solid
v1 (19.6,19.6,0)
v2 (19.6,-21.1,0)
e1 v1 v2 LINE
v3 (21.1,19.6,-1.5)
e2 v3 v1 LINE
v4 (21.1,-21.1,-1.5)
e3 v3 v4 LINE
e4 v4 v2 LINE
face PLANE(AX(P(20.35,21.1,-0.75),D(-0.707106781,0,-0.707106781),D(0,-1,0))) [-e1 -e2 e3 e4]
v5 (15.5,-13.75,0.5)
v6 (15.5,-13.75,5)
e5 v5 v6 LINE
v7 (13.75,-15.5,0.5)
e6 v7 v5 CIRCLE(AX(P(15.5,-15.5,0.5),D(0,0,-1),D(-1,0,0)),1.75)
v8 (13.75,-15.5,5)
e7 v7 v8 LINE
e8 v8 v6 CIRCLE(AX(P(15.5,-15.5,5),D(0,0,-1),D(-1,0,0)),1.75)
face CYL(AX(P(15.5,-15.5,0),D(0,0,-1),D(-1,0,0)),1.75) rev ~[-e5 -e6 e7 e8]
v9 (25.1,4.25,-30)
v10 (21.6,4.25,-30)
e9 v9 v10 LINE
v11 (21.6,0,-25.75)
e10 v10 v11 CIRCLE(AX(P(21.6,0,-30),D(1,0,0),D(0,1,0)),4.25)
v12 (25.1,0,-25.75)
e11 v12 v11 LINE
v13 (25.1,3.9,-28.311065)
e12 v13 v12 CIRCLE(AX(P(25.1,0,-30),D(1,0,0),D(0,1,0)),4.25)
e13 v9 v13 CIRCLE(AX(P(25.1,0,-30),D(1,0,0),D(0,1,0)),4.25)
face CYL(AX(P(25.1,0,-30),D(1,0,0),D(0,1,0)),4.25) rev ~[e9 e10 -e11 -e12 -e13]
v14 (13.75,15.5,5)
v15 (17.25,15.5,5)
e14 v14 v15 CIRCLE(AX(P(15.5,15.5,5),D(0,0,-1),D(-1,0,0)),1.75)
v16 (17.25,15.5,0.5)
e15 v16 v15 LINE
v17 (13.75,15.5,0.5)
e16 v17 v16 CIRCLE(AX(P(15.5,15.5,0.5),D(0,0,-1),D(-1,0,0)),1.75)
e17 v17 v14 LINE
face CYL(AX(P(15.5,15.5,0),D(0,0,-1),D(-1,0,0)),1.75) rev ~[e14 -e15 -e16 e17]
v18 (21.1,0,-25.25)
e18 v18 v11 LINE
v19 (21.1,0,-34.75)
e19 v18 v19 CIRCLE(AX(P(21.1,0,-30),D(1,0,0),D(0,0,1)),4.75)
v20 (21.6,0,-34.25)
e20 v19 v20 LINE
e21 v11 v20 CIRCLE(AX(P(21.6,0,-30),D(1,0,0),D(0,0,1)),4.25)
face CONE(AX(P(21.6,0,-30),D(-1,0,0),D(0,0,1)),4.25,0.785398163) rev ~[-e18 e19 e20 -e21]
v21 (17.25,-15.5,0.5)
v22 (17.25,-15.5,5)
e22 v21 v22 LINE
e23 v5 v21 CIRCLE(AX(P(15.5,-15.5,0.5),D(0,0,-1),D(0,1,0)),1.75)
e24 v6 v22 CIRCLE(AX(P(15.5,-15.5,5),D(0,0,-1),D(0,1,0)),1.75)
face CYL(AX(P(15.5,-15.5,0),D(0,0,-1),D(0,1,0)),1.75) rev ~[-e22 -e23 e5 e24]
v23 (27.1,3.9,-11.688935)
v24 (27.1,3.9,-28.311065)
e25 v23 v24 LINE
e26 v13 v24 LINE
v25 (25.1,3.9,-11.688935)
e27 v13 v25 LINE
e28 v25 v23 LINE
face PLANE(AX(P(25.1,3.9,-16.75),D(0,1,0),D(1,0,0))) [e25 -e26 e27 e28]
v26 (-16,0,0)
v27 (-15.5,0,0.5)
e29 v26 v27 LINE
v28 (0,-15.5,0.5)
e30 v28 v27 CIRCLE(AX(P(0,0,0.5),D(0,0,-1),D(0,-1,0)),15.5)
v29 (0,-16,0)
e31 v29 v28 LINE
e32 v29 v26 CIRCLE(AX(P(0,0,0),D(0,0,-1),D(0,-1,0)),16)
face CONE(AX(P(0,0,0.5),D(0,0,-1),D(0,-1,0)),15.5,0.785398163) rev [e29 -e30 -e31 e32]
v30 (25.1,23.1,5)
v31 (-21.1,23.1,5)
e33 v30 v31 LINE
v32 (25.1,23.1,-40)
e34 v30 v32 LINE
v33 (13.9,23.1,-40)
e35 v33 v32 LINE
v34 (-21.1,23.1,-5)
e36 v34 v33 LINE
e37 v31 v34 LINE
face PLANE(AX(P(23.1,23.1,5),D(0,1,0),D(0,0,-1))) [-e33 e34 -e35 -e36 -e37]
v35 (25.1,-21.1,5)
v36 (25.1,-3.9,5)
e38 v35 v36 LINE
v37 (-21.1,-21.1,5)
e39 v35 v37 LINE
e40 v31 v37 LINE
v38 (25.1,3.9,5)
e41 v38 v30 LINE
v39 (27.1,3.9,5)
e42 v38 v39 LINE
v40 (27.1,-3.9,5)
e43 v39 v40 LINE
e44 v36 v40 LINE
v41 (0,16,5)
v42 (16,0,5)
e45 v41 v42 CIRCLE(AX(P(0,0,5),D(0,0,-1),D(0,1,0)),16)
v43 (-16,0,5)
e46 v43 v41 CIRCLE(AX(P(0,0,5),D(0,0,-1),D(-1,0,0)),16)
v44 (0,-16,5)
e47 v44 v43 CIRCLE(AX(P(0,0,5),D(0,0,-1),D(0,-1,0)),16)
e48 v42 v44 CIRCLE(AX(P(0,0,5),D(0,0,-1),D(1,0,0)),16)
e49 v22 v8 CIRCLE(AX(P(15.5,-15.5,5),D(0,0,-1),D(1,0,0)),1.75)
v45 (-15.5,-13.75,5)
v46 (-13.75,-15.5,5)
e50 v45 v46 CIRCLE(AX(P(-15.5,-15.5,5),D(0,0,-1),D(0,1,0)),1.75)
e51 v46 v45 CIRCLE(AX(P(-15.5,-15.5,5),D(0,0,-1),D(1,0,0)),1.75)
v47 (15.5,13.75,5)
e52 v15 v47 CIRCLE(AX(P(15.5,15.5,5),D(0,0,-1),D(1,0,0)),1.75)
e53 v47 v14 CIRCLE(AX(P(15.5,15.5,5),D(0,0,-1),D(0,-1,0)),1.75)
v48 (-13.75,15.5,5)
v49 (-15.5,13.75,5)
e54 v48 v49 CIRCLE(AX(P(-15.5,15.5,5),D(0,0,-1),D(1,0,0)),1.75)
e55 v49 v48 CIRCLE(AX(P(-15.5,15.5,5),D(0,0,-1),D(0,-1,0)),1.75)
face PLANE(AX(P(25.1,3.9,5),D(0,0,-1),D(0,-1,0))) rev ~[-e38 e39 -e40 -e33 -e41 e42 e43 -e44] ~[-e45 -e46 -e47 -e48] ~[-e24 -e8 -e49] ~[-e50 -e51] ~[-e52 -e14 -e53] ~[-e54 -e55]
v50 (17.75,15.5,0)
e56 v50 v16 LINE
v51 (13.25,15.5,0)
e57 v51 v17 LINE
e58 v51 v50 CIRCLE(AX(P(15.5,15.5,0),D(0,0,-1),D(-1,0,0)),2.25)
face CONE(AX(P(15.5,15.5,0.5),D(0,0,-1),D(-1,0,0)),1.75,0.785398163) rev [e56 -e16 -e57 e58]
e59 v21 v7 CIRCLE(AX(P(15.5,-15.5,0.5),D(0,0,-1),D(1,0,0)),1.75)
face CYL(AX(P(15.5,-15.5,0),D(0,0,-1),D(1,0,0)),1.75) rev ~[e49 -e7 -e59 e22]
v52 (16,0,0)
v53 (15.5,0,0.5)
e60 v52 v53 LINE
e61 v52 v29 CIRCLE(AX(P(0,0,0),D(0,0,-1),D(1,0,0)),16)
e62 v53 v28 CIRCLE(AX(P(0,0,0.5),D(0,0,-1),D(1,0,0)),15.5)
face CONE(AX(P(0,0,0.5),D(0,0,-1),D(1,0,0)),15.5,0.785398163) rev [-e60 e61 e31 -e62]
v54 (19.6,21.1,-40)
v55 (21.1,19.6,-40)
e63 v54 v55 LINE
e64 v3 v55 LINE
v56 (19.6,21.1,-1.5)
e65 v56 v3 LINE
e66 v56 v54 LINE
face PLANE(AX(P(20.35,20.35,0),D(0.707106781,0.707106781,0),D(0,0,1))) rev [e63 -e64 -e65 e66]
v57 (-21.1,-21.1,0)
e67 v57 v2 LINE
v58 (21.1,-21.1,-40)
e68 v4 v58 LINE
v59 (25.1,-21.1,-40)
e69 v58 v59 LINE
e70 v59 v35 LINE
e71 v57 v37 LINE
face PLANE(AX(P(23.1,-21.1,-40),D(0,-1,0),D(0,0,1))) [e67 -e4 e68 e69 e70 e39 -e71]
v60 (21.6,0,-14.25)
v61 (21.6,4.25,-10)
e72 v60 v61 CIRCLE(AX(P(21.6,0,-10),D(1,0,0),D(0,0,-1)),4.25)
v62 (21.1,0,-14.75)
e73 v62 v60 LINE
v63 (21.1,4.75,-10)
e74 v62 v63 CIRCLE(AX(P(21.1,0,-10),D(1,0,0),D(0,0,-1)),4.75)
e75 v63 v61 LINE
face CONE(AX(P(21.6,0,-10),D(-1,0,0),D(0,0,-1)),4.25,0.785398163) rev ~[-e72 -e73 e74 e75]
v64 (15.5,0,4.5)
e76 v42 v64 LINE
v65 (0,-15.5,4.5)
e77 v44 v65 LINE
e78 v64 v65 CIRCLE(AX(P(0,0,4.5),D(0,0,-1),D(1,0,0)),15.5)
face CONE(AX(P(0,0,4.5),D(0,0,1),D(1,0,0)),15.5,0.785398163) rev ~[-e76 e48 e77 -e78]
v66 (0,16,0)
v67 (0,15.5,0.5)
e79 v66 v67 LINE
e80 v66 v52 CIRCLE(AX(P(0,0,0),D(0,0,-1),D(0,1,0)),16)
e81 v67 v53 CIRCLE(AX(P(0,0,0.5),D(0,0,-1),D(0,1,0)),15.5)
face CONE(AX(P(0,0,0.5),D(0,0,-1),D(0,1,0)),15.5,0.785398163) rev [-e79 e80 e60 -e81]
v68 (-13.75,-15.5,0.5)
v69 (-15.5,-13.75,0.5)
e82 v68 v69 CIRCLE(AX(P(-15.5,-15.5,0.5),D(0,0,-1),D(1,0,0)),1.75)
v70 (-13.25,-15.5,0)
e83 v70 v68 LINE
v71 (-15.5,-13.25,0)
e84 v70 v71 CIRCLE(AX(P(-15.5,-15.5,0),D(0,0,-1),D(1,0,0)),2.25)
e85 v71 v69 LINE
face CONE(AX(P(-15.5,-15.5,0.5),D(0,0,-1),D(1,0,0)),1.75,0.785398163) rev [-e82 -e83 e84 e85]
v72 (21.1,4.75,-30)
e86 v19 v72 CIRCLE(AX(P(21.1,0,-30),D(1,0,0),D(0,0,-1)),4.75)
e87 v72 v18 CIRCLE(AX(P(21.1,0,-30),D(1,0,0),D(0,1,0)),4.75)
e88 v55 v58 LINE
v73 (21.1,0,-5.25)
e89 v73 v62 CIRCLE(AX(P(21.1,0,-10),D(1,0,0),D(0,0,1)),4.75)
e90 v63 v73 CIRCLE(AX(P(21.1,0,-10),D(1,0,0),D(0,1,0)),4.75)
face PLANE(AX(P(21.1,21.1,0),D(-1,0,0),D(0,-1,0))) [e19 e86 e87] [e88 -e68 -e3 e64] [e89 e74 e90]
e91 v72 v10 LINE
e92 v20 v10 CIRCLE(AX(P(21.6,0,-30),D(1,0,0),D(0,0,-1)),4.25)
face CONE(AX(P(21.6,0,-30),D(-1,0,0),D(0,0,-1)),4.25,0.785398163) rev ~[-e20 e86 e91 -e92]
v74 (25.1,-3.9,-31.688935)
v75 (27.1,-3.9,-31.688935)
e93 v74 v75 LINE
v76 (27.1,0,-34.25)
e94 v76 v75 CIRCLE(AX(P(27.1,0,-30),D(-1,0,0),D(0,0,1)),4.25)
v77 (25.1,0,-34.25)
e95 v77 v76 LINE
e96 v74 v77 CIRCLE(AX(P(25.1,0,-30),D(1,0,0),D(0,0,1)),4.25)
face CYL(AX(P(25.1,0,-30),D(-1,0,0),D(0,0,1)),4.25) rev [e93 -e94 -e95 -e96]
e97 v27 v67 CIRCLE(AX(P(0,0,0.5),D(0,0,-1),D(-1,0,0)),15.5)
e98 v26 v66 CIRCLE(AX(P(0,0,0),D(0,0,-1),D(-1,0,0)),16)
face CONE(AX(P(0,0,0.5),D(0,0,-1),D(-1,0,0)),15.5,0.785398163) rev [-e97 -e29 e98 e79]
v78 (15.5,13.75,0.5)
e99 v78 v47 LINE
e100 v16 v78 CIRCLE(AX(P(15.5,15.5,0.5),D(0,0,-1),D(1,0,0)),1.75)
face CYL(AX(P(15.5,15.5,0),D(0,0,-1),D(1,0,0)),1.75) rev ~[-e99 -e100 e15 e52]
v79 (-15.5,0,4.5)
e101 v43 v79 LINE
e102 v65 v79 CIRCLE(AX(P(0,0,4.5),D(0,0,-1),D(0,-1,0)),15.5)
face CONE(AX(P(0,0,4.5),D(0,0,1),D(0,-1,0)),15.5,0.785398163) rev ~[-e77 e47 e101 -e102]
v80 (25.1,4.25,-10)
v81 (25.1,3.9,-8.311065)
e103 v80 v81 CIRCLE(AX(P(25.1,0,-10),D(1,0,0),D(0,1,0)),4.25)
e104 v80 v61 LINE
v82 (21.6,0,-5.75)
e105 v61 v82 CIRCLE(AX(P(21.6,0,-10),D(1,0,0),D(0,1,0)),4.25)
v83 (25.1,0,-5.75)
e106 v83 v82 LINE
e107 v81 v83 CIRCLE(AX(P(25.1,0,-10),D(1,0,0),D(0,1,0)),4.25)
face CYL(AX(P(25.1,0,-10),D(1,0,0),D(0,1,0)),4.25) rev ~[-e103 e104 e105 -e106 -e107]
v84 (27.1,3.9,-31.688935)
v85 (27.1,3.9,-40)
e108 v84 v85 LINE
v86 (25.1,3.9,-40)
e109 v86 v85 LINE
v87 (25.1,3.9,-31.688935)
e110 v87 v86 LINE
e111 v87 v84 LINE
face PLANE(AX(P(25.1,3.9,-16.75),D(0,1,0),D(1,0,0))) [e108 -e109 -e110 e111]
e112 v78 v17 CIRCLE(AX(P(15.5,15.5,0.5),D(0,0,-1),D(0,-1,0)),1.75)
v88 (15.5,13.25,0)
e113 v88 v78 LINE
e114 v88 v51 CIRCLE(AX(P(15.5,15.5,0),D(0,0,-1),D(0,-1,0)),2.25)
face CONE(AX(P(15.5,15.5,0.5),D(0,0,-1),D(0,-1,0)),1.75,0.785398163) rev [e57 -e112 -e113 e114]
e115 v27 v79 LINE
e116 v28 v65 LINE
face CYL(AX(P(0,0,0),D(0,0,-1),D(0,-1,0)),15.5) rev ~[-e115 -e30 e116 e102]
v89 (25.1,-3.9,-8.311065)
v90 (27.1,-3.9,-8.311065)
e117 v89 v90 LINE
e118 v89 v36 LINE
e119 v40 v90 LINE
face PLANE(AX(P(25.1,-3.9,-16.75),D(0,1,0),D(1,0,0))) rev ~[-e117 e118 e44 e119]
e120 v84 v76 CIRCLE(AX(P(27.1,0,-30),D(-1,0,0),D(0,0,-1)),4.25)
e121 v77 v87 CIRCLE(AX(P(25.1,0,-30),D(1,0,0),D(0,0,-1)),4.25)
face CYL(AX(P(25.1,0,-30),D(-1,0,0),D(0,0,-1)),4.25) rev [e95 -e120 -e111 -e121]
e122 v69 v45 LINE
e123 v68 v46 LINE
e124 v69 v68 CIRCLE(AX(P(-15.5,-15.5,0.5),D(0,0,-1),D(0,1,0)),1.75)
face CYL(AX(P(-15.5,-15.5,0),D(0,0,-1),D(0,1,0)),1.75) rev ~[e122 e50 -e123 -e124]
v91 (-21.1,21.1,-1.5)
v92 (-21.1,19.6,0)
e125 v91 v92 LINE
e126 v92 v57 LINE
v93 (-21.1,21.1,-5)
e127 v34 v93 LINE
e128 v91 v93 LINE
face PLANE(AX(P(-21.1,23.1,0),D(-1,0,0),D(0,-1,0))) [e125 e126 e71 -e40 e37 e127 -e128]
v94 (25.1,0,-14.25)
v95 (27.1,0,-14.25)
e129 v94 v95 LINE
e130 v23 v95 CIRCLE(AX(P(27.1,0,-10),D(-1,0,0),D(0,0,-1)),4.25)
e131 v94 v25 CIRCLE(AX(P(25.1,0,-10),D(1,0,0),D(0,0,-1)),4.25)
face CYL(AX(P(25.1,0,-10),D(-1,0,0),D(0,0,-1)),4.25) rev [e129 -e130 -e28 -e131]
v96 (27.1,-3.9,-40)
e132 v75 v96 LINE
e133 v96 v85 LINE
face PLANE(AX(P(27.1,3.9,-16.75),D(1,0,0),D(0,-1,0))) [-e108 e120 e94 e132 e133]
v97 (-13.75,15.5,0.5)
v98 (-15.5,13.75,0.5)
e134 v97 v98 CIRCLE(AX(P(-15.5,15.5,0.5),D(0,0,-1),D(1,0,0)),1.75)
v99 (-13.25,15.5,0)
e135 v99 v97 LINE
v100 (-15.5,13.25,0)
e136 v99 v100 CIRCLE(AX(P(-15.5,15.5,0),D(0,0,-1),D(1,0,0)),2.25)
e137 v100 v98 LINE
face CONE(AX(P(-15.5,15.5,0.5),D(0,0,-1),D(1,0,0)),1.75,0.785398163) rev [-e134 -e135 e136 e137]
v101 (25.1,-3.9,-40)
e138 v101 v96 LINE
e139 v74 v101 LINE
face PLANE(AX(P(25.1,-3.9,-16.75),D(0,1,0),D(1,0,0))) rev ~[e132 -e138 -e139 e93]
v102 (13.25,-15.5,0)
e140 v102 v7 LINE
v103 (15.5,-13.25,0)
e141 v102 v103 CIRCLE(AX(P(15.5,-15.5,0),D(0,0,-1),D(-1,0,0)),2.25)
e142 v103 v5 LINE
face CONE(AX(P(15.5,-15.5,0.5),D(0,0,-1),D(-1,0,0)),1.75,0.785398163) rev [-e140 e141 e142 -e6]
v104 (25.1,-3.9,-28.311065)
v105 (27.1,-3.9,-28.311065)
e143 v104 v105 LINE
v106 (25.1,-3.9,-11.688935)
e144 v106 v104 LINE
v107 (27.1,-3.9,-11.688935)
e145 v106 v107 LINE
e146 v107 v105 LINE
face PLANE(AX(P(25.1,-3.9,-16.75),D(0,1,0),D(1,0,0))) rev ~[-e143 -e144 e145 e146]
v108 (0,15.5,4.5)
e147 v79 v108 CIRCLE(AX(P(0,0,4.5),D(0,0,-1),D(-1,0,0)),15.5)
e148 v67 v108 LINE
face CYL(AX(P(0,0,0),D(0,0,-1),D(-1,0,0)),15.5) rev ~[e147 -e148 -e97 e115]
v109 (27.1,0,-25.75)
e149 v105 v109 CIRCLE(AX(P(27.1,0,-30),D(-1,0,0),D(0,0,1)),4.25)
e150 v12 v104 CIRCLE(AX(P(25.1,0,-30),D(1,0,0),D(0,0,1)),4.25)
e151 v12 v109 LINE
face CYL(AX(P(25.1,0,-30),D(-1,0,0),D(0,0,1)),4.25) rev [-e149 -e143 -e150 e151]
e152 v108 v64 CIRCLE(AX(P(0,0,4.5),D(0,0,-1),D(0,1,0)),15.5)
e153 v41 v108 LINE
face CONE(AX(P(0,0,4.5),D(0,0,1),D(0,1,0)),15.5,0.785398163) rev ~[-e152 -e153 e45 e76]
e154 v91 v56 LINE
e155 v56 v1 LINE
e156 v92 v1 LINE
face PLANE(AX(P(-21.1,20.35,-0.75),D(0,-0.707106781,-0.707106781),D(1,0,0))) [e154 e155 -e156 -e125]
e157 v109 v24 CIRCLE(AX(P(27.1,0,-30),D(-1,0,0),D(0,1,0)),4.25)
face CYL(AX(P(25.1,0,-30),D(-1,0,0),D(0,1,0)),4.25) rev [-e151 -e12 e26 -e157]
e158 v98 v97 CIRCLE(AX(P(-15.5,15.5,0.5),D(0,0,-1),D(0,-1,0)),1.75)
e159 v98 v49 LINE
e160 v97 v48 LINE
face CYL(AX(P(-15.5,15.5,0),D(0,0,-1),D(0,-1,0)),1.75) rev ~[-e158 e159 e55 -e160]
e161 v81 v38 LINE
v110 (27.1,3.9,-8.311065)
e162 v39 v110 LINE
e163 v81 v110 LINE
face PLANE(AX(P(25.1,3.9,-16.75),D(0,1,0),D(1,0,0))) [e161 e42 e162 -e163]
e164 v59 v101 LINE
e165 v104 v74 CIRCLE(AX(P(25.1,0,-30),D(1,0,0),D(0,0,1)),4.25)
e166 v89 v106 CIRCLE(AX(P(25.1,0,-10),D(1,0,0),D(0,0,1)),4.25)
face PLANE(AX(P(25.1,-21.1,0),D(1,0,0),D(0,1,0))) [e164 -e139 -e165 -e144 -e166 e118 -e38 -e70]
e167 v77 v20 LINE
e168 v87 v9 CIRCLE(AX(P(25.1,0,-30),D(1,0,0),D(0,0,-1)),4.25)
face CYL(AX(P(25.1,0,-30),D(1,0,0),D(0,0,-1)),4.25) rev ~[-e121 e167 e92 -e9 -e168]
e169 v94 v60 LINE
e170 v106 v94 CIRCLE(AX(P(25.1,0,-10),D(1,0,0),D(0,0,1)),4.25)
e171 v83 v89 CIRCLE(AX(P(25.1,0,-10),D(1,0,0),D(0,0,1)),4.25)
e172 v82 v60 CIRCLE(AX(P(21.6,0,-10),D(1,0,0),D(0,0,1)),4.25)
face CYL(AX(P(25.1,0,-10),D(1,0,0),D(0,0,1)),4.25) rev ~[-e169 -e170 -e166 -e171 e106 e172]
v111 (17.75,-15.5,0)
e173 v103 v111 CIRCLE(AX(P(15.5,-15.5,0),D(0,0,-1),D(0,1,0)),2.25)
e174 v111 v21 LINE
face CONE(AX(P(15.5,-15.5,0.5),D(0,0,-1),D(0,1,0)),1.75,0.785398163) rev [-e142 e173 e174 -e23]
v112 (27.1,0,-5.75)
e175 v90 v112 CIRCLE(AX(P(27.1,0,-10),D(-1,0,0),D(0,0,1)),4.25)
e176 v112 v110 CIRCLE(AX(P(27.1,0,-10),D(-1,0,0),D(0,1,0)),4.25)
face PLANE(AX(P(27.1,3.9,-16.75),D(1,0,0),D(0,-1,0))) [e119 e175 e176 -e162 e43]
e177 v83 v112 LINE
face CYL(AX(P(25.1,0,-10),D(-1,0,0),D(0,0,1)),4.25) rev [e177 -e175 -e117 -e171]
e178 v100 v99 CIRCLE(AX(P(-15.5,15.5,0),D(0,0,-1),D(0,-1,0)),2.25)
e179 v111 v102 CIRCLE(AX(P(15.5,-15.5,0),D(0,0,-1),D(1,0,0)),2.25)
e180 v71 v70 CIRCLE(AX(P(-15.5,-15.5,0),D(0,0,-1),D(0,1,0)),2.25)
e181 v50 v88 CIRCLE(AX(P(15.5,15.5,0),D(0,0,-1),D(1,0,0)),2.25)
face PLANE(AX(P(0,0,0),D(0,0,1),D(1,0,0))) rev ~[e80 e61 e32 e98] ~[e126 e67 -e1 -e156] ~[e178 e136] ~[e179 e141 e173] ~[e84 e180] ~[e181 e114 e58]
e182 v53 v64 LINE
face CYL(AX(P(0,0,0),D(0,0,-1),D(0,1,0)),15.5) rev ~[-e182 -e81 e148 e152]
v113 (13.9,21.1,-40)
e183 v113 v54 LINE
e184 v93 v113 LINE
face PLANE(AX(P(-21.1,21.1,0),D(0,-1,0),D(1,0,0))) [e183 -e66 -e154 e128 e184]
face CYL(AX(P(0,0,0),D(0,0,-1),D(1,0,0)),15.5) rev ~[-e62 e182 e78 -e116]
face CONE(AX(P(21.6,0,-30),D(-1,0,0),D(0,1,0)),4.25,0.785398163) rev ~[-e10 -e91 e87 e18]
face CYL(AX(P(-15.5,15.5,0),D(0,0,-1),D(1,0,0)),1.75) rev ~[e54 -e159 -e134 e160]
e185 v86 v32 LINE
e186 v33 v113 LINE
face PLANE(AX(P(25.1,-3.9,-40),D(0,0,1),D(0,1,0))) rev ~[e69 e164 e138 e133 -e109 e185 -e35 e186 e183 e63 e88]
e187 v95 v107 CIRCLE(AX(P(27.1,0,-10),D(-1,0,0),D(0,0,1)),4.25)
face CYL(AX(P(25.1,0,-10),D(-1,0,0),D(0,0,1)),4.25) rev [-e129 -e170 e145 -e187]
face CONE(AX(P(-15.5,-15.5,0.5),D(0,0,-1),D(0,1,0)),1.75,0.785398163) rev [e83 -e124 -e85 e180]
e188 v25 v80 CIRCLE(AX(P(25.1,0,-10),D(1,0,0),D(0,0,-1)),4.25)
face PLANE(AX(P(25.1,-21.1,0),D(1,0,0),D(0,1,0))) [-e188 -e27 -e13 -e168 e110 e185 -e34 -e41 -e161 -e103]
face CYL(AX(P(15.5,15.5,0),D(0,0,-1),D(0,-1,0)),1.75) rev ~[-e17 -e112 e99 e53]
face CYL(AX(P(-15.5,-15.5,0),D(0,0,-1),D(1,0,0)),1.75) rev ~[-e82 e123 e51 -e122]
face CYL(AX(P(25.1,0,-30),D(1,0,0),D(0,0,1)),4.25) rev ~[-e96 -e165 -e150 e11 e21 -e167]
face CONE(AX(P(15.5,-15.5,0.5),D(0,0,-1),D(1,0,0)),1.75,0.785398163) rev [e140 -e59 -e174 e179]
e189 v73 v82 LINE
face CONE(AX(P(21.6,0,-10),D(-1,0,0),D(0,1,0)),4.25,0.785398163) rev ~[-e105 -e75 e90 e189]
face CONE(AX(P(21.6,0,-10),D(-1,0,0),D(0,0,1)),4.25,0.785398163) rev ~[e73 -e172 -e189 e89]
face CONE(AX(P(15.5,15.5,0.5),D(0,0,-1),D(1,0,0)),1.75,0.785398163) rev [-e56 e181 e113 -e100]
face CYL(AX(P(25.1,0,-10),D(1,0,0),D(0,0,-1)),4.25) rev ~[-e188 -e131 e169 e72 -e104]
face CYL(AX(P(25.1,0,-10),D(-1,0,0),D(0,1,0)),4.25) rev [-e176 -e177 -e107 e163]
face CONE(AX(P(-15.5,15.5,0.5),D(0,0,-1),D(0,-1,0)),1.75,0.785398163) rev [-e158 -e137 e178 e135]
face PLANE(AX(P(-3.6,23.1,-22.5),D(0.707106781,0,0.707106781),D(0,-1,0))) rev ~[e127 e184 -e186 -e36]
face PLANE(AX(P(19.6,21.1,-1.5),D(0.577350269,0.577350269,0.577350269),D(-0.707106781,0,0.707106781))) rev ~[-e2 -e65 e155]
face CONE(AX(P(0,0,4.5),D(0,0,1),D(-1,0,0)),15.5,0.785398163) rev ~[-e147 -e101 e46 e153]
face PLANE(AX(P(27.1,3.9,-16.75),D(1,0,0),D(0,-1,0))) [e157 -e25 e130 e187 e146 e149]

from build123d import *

# Parameters (mm, degrees)
F0_W      = 42.2
F0_H      = 42.2
F1_DEPTH  = 5
F2_DEPTH  = 40
F3_DEPTH  = 2
F5_DEPTH  = 25
F4_W      = 3.9
F4_H      = 6.5
F6_DEPTH  = 2
F7_SIZE   = 0.5
F8_SIZE   = 35
F9_DEPTH  = 16.75
F10_DEPTH = 21.75
F11_DEPTH = 25
F12_SIZE  = 1.5


# Not quite as in the source:
# - a feature names something its author has since deleted; it is built from what else it names


with BuildPart() as f1:
    # F0 (on Top) → F1 (new body)
    with BuildSketch(Plane.XY):
        Rectangle(F0_W, F0_H)
        with BuildLine():
            ThreePointArc((-15.5, 13.75), (-16.7374368671, 16.7374368671), (-13.75, 15.5))
            Line((-13.75, 15.5), (0, 15.5))
            Line((0, 15.5), (13.75, 15.5))
            ThreePointArc((13.75, 15.5), (15.5, 17.25), (17.25, 15.5))
            ThreePointArc((17.25, 15.5), (16.7374368671, 14.2625631329), (15.5, 13.75))
            Line((15.5, 13.75), (15.5, 0))
            Line((15.5, 0), (15.5, -13.75))
            ThreePointArc((15.5, -13.75), (16.7374368671, -14.2625631329), (17.25, -15.5))
            ThreePointArc((17.25, -15.5), (15.5, -17.25), (13.75, -15.5))
            Line((13.75, -15.5), (0, -15.5))
            Line((0, -15.5), (-13.75, -15.5))
            ThreePointArc((-13.75, -15.5), (-16.7374368671, -16.7374368671), (-15.5, -13.75))
            Line((-15.5, -13.75), (-15.5, 0))
            Line((-15.5, 0), (-15.5, 13.75))
        make_face(mode=Mode.SUBTRACT)
        Polygon((-21.1, 21.1), (21.1, 21.1), (21.1, -21.1), (23.1, -21.1), (23.1, 23.1), (-21.1, 23.1), align=None)
        with BuildLine():
            Line((0, 15.5), (-13.75, 15.5))
            ThreePointArc((-13.75, 15.5), (-14.2625631329, 14.2625631329), (-15.5, 13.75))
            Line((-15.5, 13.75), (-15.5, 0))
            ThreePointArc((-15.5, 0), (-10.9601551084, 10.9601551084), (0, 15.5))
        make_face()
        with BuildLine():
            ThreePointArc((0, -15.5), (-10.9601551084, -10.9601551084), (-15.5, 0))
            Line((-15.5, 0), (-15.5, -13.75))
            ThreePointArc((-15.5, -13.75), (-14.2625631329, -14.2625631329), (-13.75, -15.5))
            Line((-13.75, -15.5), (0, -15.5))
        make_face()
        with BuildLine():
            Line((15.5, -13.75), (15.5, 0))
            ThreePointArc((15.5, 0), (10.9601551084, -10.9601551084), (0, -15.5))
            Line((0, -15.5), (13.75, -15.5))
            ThreePointArc((13.75, -15.5), (14.2625631329, -14.2625631329), (15.5, -13.75))
        make_face()
        with BuildLine():
            Line((13.75, 15.5), (0, 15.5))
            ThreePointArc((0, 15.5), (10.9601551084, 10.9601551084), (15.5, 0))
            Line((15.5, 0), (15.5, 13.75))
            ThreePointArc((15.5, 13.75), (14.2625631329, 14.2625631329), (13.75, 15.5))
        make_face()
    extrude(amount=F1_DEPTH)

    # F0 (on Top) → F2 (join)
    with BuildSketch(Plane.XY):
        Polygon((-21.1, 21.1), (21.1, 21.1), (21.1, -21.1), (23.1, -21.1), (23.1, 23.1), (-21.1, 23.1), align=None)
    extrude(amount=-F2_DEPTH)

    # F3 (add): a face of the model
    f3_faces = [f1.faces().sort_by_distance(p)[0] for p in [
        (23.1, 1, -17.5),
    ]]
    extrude(f3_faces, amount=F3_DEPTH)

    # F4 (on face) → F5 (cut)
    with BuildSketch(Plane.YZ.offset(25.1)):
        with BuildLine():
            ThreePointArc((4.25, -10), (3.00520382, -6.99479618), (0, -5.75))
            Line((0, -5.75), (0, -10))
            Line((0, -10), (0, -14.25))
            ThreePointArc((0, -14.25), (3.00520382, -13.00520382), (4.25, -10))
        make_face()
        with BuildLine():
            Line((0, -10), (0, -5.75))
            ThreePointArc((0, -5.75), (-4.25, -10), (0, -14.25))
            Line((0, -14.25), (0, -10))
        make_face()
        with BuildLine():
            Line((0, -30), (0, -34.25))
            ThreePointArc((0, -34.25), (3.00520382, -33.00520382), (4.25, -30))
            Line((4.25, -30), (0, -30))
        make_face()
        with BuildLine():
            ThreePointArc((0, -25.75), (-4.25, -30), (0, -34.25))
            Line((0, -34.25), (0, -30))
            Line((0, -30), (0, -25.75))
        make_face()
        with BuildLine():
            ThreePointArc((4.25, -30), (3.00520382, -26.99479618), (0, -25.75))
            Line((0, -25.75), (0, -30))
            Line((0, -30), (4.25, -30))
        make_face()
    extrude(amount=-F5_DEPTH, mode=Mode.SUBTRACT)

    # F4 (on face) → F6 (join)
    with BuildSketch(Plane.YZ.offset(25.1)):
        with Locations((1.95, -20)):
            Rectangle(F4_W, F4_H)
        with Locations((-1.95, -20)):
            Rectangle(F4_W, F4_H)
    extrude(amount=F6_DEPTH)

    # F7
    f7_edges = [f1.edges().sort_by_distance(p)[0] for p in [
        (21.1, -4.25, -30),
        (21.1, -4.25, -10),
        (0, -15.5, 5),
        (0, -15.5, 0),
        (-17.25, 15.5, 0),
        (-15.5, -17.25, 0),
        (17.25, -15.5, 0),
        (15.5, 17.25, 0),
    ]]
    chamfer(f7_edges, length=F7_SIZE)

    # F8
    f8_edges = [f1.edges().sort_by_distance(p)[0] for p in [
        (-21.1, 22.1, -40),
    ]]
    chamfer(f8_edges, length=F8_SIZE)

    # F9 (add): a face of the model
    f9_faces = [f1.faces().sort_by_distance(p)[0] for p in [
        (26.1, 0, -23.25),
    ]]
    extrude(f9_faces, amount=F9_DEPTH)

    # F10 (add): a face of the model
    f10_faces = [f1.faces().sort_by_distance(p)[0] for p in [
        (26.1, 0, -16.75),
    ]]
    extrude(f10_faces, amount=F10_DEPTH)

    # F11 (cut): faces of the model
    f11_faces = [f1.faces().sort_by_distance(p)[0] for p in [
        (25.1, 0, -10),
        (25.1, 0, -30),
    ]]
    extrude(f11_faces, amount=-F11_DEPTH, mode=Mode.SUBTRACT)

    # F12
    f12_edges = [f1.edges().sort_by_distance(p)[0] for p in [
        (21.1, 0, 0),
        (21.1, 21.1, -20),
        (0, 21.1, 0),
    ]]
    chamfer(f12_edges, length=F12_SIZE)


solid = f1.part
